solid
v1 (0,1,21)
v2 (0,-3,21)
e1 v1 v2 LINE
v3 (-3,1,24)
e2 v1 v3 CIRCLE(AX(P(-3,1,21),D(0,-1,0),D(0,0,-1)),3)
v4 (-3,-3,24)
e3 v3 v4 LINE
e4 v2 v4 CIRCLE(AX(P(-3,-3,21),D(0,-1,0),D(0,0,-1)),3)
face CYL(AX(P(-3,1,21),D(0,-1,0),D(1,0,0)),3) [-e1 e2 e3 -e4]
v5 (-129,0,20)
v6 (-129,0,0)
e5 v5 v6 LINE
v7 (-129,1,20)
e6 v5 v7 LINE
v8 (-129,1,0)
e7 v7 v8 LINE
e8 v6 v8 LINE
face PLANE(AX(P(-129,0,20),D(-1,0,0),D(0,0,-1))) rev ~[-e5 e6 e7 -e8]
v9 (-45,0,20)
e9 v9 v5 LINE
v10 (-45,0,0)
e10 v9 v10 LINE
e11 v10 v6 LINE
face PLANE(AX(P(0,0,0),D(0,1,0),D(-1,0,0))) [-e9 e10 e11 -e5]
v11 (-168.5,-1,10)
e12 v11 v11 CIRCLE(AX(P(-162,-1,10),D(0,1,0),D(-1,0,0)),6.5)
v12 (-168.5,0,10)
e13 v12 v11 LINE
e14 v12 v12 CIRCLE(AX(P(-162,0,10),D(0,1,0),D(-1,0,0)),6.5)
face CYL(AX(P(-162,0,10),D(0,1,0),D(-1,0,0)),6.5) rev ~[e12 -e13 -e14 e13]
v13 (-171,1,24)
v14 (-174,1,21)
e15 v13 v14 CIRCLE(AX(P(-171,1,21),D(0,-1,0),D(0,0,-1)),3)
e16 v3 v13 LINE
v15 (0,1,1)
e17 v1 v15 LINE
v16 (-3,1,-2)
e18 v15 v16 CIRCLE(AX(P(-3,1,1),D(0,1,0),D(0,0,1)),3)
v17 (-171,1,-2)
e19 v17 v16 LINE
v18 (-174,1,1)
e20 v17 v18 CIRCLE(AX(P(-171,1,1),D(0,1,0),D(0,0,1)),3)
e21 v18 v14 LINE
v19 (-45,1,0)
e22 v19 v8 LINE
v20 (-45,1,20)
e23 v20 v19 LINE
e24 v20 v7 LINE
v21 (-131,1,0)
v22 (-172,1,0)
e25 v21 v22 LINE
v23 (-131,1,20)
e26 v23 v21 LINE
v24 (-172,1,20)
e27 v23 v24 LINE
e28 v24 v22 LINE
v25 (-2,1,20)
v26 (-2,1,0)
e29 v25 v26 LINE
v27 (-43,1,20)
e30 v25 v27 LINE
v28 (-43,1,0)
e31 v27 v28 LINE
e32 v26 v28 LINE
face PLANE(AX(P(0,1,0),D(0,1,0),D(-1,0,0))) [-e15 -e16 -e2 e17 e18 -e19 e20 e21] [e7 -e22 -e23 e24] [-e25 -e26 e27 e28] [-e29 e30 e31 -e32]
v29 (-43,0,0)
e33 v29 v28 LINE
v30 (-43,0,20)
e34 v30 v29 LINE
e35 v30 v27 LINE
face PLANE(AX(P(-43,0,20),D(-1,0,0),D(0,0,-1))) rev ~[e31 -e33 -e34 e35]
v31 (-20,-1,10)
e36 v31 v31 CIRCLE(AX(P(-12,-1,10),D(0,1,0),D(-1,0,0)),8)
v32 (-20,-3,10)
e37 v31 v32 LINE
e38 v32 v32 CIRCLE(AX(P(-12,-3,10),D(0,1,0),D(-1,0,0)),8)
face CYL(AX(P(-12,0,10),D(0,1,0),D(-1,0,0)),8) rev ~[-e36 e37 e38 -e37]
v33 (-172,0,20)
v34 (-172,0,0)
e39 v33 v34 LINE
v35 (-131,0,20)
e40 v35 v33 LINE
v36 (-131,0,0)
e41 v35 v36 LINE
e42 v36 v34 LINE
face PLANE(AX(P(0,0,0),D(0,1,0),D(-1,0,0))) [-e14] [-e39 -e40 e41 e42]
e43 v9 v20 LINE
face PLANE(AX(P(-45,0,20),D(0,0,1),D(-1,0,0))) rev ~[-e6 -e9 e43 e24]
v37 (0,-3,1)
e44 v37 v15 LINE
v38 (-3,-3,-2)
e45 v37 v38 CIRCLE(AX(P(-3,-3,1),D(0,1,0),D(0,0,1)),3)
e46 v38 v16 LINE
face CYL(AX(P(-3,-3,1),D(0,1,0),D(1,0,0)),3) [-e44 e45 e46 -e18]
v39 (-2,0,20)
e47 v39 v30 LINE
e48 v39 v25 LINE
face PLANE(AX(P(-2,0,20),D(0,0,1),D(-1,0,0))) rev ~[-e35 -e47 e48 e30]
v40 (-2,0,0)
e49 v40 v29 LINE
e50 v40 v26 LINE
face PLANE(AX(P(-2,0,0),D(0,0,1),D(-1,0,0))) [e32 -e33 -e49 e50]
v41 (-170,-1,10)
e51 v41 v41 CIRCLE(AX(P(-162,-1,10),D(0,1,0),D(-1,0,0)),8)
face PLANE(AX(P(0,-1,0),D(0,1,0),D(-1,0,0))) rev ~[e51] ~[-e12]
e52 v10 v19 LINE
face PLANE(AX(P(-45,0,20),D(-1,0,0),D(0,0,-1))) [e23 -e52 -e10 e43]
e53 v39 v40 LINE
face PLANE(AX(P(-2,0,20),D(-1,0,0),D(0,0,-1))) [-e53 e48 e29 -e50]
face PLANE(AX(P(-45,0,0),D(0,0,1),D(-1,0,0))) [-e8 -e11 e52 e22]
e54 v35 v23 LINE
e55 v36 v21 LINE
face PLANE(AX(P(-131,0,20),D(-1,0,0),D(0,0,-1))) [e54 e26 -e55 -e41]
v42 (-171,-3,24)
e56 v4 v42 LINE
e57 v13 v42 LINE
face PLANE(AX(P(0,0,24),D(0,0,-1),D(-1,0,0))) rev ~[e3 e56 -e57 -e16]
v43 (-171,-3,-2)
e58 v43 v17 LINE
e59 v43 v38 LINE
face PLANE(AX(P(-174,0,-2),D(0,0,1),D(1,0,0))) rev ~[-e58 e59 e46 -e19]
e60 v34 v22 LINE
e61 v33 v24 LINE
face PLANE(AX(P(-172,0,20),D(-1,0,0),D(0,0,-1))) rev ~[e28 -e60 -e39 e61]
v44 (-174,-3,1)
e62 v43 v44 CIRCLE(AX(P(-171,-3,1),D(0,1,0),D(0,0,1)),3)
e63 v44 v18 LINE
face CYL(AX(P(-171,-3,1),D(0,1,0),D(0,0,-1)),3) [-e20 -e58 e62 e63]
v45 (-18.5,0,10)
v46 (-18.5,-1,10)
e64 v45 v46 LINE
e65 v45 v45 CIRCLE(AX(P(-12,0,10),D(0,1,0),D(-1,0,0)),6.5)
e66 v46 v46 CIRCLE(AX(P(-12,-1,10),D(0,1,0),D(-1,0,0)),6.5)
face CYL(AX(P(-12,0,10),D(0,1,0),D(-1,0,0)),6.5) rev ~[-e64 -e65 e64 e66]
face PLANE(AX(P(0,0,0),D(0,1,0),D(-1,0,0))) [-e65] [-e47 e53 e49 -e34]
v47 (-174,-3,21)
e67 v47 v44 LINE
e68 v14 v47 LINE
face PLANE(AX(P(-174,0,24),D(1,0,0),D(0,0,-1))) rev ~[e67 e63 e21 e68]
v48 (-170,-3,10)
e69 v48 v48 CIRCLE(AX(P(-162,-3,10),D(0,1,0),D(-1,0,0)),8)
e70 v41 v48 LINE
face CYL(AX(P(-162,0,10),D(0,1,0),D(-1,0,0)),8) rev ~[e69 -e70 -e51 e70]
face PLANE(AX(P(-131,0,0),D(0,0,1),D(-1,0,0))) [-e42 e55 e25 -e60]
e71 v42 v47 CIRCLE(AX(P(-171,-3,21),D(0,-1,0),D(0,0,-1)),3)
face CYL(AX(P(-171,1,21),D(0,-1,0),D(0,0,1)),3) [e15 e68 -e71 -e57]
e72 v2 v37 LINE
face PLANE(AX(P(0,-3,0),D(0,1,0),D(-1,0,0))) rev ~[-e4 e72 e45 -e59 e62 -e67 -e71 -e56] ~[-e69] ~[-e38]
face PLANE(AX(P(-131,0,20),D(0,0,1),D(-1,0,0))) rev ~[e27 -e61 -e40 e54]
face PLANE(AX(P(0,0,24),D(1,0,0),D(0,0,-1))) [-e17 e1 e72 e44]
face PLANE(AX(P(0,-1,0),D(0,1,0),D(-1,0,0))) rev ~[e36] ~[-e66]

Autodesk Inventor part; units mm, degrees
ref_plane "YZ Plane" through (0, 0, 0) normal (1, 0, 0) x (0, 1, 0)
ref_plane "XZ Plane" through (0, 0, 0) normal (0, 1, 0) x (-1, 0, 0)
ref_plane "XY Plane" through (0, 0, 0) normal (0, 0, 1) x (1, 0, 0)
sketch "Sketch1" plane through (0, 0, 0) normal (0, 1, 0) x (-1, 0, 0)
  line L0 (172, 20) -> (172, 0)
  line L1 (2, 20) -> (2, 0)
  line L2 (43, 20) -> (43, 0)
  line L3 (131, 20) -> (131, 0)
  line L4 (129, 20) -> (129, 0)
  line L5 (174, 24) -> (174, 0)
  line L6 (45, 20) -> (45, 0)
  line L7 (0, 24) -> (0, 0)
  line L8 (0, 0) -> (174, 0)
  line L9 (0, 24) -> (174, 24)
  line L10 (131, 20) -> (172, 20)
  line L11 (2, 20) -> (43, 20)
  line L12 (45, 20) -> (129, 20)
  line L13 (0, 0) -> (174, 0)
  line L14 (174, 0) -> (174, -2)
  line L15 (174, -2) -> (0, -2)
  line L16 (0, -2) -> (0, 0)
  line L17 (2, 10) -> (172, 10) construction
  line L18 (162, 20) -> (162, 0) construction
  line L19 (12, 20) -> (12, 0) construction
  circle A0 centre (12, 10) radius 8
  circle A1 centre (12, 10) radius 6.5
  circle A2 centre (162, 10) radius 6.5
  circle A3 centre (162, 10) radius 8
  dimension "d4" = 41
  dimension "d5" = 41
  dimension "d7" = 2
  dimension "d8" = 2
  dimension "d9" = 2
  dimension "d10" = 2
  dimension "d12" = 174
  dimension "d17" = 4
  dimension "d20" = 20
  dimension "d21" = 2
  dimension "d22" = 10
  dimension "d23" = 10
  dimension "d24" = 16
  dimension "d25" = 13
extrude "Extrusion1" add sketch "Sketch1" against normal blind 3 contours L10 L3 L8 L4 L12 L6 L2 L11 L1 L7 L9 L5 L0 | L0 L8 L3 L10 | L8 L14 L15 L16 | L8 L6 L12 L4 | L8 L1 L11 L2
extrude "Extrusion2" add sketch "Sketch1" along normal blind 1 contours L10 L3 L8 L4 L12 L6 L2 L11 L1 L7 L9 L5 L0 | L8 L14 L15 L16
extrude "Extrusion3" add sketch "Sketch1" against normal blind 1 contours A0 | A3
fillet "Fillet1" radius 3 4 edges at (-174, -1, -2) (-174, -1, 24) (0, -1, 24) (0, -1, -2)
properties part number "arm1a"
